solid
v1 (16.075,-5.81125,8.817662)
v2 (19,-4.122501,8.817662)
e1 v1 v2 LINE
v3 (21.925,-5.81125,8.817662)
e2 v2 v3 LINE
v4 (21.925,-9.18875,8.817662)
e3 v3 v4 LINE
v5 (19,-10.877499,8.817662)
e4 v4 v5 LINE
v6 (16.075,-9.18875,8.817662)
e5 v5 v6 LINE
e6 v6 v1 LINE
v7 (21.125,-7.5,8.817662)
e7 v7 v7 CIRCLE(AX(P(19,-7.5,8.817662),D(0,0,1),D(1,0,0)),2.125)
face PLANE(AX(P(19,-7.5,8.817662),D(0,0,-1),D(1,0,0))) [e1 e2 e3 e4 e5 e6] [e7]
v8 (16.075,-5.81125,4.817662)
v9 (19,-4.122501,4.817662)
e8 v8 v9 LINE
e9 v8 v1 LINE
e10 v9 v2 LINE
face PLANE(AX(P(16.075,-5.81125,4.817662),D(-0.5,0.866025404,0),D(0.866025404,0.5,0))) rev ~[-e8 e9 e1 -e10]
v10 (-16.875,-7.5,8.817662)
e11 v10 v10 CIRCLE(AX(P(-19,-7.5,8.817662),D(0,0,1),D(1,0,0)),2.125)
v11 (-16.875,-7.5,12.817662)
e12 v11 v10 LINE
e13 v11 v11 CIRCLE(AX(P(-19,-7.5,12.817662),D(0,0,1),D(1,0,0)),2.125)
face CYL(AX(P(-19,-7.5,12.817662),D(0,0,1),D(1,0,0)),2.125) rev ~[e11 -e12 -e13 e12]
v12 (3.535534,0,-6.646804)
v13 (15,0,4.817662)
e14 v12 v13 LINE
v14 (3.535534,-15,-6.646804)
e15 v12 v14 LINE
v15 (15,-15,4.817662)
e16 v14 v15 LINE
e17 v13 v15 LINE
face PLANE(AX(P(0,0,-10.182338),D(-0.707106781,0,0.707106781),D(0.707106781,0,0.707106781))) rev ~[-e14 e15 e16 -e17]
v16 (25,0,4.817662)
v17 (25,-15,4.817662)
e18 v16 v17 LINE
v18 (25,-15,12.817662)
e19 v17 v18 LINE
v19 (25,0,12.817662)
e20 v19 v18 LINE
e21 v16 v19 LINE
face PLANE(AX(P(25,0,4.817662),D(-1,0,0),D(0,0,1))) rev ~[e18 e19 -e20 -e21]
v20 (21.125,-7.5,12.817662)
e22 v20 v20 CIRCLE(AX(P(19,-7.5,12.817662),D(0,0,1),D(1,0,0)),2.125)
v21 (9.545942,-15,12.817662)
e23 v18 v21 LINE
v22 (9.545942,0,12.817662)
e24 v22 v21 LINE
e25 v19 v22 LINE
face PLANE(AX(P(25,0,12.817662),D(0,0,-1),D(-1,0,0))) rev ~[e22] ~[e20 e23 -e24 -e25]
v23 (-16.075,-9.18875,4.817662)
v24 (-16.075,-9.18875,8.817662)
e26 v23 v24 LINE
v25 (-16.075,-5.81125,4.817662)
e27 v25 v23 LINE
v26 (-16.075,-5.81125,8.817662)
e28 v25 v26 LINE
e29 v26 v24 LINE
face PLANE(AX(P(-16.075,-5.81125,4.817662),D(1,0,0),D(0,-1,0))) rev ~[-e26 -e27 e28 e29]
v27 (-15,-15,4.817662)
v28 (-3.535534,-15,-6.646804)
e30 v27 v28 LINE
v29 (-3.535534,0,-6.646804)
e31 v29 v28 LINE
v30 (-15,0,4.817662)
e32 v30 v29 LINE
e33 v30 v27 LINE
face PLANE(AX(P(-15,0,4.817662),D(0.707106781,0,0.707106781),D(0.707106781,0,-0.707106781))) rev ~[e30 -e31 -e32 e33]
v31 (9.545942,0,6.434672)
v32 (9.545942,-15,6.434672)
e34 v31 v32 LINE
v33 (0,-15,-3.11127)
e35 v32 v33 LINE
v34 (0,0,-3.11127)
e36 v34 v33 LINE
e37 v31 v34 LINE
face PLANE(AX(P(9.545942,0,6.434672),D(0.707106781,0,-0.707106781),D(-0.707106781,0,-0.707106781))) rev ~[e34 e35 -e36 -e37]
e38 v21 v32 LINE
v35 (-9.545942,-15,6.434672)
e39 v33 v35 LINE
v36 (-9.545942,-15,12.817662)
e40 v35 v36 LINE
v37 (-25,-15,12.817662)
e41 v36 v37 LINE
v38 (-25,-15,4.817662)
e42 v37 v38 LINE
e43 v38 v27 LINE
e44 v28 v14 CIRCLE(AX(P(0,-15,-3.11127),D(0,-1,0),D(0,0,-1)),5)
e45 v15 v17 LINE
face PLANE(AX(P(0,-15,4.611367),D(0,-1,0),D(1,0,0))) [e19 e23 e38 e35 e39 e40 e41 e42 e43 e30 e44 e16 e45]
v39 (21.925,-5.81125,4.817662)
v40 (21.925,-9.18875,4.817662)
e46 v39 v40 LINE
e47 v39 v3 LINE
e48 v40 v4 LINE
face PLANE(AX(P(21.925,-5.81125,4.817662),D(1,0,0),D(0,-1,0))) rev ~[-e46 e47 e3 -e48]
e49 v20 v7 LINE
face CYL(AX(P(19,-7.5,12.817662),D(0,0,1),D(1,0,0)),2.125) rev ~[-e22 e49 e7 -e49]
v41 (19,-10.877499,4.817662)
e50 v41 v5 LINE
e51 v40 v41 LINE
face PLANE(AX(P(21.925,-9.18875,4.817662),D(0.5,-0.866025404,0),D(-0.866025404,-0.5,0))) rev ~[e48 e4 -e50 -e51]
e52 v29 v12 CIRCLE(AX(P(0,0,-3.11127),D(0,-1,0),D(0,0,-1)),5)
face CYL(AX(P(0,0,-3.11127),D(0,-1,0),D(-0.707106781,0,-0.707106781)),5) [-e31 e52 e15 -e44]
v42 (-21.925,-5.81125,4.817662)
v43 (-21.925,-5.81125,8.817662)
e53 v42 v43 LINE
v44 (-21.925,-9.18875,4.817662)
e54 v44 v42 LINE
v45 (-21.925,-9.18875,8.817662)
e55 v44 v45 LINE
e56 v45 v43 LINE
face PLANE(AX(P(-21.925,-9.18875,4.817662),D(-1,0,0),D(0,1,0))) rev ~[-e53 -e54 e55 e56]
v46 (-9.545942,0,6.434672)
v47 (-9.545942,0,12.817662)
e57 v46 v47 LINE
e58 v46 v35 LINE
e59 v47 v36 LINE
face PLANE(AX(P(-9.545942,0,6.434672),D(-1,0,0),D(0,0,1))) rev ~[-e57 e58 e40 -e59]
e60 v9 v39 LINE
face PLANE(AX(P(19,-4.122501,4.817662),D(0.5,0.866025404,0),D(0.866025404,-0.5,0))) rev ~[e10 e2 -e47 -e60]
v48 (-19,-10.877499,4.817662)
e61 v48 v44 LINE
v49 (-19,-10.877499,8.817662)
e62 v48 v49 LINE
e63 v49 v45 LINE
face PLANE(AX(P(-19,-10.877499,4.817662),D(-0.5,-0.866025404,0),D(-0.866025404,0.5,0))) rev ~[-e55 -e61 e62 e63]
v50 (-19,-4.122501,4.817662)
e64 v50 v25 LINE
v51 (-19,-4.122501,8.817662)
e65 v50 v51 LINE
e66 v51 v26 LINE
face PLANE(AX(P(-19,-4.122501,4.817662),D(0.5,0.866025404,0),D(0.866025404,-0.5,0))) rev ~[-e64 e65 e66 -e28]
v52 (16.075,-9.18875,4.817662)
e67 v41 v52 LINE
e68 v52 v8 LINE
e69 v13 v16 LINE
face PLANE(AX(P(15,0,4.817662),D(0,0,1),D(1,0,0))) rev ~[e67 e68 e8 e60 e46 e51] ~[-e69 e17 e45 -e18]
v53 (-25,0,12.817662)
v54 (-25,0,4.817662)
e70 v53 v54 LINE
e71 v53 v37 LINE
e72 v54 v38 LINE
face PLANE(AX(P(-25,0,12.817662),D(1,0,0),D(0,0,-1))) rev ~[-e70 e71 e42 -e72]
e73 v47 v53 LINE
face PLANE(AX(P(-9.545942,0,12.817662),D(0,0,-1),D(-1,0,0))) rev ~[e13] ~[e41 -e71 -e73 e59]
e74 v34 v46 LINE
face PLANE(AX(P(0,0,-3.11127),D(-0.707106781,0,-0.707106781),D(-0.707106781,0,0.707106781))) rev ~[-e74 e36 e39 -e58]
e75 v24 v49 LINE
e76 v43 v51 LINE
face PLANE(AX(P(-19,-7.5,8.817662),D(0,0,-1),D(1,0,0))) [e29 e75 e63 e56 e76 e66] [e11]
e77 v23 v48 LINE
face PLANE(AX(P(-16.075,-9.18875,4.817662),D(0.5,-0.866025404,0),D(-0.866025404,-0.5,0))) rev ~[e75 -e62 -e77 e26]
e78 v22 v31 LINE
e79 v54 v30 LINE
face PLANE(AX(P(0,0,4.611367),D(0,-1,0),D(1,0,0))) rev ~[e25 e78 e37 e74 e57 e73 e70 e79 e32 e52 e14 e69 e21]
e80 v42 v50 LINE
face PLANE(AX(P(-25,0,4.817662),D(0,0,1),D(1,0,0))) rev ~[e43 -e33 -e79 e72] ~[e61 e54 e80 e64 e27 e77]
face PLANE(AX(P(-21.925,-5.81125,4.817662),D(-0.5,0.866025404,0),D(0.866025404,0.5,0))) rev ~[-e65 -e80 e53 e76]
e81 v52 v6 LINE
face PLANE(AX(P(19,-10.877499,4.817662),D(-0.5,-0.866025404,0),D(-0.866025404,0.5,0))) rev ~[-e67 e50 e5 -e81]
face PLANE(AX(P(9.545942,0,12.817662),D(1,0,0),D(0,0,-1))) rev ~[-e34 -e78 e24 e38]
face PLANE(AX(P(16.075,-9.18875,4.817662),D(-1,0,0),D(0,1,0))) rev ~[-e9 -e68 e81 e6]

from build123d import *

# Parameters (mm, degrees)
F1_DEPTH = 15
F2_R     = 2.125
F3_DEPTH = 25
F5_DEPTH = 4
F6_R     = 5
F8_DEPTH = 25


# Not quite as in the source:
# - a feature names something its author has since deleted; it is built from what else it names


with BuildPart() as f1:
    # F0 (on Front) → F1 (new body)
    with BuildSketch(Plane.XZ):
        Polygon((25, 12.8176623509), (15, 12.8176623509), (9.545941546, 12.8176623509), (9.545941546, 6.4346717088), (0, -3.1112698372), (-9.545941546, 6.4346717088), (-9.545941546, 12.8176623509), (-15, 12.8176623509), (-25, 12.8176623509), (-25, 4.8176623509), (-15, 4.8176623509), (-7.5, -2.6823376491), (0, -10.1823376491), (7.5, -2.6823376491), (15, 4.8176623509), (25, 4.8176623509), align=None)
    extrude(amount=F1_DEPTH)

    # F2 (on face) → F3 (cut)
    with BuildSketch(Plane.XY.offset(12.8176623509)):
        with Locations((-19, -7.5)):
            Circle(F2_R)
        with Locations((19, -7.5)):
            Circle(F2_R)
    extrude(amount=-F3_DEPTH, mode=Mode.SUBTRACT)

    # F4 (on face) → F5 (cut)
    with BuildSketch(Plane(origin=(0, 0, 4.8176623509), x_dir=(1, 0, 0), z_dir=(0, 0, -1))):
        Polygon((-21.925, 9.1887495374), (-21.925, 5.8112504626), (-19, 4.1225009252), (-16.075, 5.8112504626), (-16.075, 9.1887495374), (-19, 10.8774990748), align=None)
        Polygon((21.925, 5.8112504626), (21.925, 9.1887495374), (19, 10.8774990748), (16.075, 9.1887495374), (16.075, 5.8112504626), (19, 4.1225009252), align=None)
    extrude(amount=-F5_DEPTH, mode=Mode.SUBTRACT)

    # F6
    f6_edges = [f1.edges().sort_by_distance(p)[0] for p in [
        (0, -7.5, -10.182338),
    ]]
    fillet(f6_edges, radius=F6_R)

    # F7 (on face) → F8 (cut)
    with BuildSketch(Plane(origin=(0, 0, 8.8176623509), x_dir=(1, 0, 0), z_dir=(0, 0, -1))):
        Polygon((-21.925, 9.1887495374), (-21.925, 5.8112504626), (-19, 4.1225009252), (-16.075, 5.8112504626), (-16.075, 9.1887495374), (-19, 10.8774990748), align=None)
    extrude(amount=F8_DEPTH, mode=Mode.SUBTRACT)


solid = f1.part
